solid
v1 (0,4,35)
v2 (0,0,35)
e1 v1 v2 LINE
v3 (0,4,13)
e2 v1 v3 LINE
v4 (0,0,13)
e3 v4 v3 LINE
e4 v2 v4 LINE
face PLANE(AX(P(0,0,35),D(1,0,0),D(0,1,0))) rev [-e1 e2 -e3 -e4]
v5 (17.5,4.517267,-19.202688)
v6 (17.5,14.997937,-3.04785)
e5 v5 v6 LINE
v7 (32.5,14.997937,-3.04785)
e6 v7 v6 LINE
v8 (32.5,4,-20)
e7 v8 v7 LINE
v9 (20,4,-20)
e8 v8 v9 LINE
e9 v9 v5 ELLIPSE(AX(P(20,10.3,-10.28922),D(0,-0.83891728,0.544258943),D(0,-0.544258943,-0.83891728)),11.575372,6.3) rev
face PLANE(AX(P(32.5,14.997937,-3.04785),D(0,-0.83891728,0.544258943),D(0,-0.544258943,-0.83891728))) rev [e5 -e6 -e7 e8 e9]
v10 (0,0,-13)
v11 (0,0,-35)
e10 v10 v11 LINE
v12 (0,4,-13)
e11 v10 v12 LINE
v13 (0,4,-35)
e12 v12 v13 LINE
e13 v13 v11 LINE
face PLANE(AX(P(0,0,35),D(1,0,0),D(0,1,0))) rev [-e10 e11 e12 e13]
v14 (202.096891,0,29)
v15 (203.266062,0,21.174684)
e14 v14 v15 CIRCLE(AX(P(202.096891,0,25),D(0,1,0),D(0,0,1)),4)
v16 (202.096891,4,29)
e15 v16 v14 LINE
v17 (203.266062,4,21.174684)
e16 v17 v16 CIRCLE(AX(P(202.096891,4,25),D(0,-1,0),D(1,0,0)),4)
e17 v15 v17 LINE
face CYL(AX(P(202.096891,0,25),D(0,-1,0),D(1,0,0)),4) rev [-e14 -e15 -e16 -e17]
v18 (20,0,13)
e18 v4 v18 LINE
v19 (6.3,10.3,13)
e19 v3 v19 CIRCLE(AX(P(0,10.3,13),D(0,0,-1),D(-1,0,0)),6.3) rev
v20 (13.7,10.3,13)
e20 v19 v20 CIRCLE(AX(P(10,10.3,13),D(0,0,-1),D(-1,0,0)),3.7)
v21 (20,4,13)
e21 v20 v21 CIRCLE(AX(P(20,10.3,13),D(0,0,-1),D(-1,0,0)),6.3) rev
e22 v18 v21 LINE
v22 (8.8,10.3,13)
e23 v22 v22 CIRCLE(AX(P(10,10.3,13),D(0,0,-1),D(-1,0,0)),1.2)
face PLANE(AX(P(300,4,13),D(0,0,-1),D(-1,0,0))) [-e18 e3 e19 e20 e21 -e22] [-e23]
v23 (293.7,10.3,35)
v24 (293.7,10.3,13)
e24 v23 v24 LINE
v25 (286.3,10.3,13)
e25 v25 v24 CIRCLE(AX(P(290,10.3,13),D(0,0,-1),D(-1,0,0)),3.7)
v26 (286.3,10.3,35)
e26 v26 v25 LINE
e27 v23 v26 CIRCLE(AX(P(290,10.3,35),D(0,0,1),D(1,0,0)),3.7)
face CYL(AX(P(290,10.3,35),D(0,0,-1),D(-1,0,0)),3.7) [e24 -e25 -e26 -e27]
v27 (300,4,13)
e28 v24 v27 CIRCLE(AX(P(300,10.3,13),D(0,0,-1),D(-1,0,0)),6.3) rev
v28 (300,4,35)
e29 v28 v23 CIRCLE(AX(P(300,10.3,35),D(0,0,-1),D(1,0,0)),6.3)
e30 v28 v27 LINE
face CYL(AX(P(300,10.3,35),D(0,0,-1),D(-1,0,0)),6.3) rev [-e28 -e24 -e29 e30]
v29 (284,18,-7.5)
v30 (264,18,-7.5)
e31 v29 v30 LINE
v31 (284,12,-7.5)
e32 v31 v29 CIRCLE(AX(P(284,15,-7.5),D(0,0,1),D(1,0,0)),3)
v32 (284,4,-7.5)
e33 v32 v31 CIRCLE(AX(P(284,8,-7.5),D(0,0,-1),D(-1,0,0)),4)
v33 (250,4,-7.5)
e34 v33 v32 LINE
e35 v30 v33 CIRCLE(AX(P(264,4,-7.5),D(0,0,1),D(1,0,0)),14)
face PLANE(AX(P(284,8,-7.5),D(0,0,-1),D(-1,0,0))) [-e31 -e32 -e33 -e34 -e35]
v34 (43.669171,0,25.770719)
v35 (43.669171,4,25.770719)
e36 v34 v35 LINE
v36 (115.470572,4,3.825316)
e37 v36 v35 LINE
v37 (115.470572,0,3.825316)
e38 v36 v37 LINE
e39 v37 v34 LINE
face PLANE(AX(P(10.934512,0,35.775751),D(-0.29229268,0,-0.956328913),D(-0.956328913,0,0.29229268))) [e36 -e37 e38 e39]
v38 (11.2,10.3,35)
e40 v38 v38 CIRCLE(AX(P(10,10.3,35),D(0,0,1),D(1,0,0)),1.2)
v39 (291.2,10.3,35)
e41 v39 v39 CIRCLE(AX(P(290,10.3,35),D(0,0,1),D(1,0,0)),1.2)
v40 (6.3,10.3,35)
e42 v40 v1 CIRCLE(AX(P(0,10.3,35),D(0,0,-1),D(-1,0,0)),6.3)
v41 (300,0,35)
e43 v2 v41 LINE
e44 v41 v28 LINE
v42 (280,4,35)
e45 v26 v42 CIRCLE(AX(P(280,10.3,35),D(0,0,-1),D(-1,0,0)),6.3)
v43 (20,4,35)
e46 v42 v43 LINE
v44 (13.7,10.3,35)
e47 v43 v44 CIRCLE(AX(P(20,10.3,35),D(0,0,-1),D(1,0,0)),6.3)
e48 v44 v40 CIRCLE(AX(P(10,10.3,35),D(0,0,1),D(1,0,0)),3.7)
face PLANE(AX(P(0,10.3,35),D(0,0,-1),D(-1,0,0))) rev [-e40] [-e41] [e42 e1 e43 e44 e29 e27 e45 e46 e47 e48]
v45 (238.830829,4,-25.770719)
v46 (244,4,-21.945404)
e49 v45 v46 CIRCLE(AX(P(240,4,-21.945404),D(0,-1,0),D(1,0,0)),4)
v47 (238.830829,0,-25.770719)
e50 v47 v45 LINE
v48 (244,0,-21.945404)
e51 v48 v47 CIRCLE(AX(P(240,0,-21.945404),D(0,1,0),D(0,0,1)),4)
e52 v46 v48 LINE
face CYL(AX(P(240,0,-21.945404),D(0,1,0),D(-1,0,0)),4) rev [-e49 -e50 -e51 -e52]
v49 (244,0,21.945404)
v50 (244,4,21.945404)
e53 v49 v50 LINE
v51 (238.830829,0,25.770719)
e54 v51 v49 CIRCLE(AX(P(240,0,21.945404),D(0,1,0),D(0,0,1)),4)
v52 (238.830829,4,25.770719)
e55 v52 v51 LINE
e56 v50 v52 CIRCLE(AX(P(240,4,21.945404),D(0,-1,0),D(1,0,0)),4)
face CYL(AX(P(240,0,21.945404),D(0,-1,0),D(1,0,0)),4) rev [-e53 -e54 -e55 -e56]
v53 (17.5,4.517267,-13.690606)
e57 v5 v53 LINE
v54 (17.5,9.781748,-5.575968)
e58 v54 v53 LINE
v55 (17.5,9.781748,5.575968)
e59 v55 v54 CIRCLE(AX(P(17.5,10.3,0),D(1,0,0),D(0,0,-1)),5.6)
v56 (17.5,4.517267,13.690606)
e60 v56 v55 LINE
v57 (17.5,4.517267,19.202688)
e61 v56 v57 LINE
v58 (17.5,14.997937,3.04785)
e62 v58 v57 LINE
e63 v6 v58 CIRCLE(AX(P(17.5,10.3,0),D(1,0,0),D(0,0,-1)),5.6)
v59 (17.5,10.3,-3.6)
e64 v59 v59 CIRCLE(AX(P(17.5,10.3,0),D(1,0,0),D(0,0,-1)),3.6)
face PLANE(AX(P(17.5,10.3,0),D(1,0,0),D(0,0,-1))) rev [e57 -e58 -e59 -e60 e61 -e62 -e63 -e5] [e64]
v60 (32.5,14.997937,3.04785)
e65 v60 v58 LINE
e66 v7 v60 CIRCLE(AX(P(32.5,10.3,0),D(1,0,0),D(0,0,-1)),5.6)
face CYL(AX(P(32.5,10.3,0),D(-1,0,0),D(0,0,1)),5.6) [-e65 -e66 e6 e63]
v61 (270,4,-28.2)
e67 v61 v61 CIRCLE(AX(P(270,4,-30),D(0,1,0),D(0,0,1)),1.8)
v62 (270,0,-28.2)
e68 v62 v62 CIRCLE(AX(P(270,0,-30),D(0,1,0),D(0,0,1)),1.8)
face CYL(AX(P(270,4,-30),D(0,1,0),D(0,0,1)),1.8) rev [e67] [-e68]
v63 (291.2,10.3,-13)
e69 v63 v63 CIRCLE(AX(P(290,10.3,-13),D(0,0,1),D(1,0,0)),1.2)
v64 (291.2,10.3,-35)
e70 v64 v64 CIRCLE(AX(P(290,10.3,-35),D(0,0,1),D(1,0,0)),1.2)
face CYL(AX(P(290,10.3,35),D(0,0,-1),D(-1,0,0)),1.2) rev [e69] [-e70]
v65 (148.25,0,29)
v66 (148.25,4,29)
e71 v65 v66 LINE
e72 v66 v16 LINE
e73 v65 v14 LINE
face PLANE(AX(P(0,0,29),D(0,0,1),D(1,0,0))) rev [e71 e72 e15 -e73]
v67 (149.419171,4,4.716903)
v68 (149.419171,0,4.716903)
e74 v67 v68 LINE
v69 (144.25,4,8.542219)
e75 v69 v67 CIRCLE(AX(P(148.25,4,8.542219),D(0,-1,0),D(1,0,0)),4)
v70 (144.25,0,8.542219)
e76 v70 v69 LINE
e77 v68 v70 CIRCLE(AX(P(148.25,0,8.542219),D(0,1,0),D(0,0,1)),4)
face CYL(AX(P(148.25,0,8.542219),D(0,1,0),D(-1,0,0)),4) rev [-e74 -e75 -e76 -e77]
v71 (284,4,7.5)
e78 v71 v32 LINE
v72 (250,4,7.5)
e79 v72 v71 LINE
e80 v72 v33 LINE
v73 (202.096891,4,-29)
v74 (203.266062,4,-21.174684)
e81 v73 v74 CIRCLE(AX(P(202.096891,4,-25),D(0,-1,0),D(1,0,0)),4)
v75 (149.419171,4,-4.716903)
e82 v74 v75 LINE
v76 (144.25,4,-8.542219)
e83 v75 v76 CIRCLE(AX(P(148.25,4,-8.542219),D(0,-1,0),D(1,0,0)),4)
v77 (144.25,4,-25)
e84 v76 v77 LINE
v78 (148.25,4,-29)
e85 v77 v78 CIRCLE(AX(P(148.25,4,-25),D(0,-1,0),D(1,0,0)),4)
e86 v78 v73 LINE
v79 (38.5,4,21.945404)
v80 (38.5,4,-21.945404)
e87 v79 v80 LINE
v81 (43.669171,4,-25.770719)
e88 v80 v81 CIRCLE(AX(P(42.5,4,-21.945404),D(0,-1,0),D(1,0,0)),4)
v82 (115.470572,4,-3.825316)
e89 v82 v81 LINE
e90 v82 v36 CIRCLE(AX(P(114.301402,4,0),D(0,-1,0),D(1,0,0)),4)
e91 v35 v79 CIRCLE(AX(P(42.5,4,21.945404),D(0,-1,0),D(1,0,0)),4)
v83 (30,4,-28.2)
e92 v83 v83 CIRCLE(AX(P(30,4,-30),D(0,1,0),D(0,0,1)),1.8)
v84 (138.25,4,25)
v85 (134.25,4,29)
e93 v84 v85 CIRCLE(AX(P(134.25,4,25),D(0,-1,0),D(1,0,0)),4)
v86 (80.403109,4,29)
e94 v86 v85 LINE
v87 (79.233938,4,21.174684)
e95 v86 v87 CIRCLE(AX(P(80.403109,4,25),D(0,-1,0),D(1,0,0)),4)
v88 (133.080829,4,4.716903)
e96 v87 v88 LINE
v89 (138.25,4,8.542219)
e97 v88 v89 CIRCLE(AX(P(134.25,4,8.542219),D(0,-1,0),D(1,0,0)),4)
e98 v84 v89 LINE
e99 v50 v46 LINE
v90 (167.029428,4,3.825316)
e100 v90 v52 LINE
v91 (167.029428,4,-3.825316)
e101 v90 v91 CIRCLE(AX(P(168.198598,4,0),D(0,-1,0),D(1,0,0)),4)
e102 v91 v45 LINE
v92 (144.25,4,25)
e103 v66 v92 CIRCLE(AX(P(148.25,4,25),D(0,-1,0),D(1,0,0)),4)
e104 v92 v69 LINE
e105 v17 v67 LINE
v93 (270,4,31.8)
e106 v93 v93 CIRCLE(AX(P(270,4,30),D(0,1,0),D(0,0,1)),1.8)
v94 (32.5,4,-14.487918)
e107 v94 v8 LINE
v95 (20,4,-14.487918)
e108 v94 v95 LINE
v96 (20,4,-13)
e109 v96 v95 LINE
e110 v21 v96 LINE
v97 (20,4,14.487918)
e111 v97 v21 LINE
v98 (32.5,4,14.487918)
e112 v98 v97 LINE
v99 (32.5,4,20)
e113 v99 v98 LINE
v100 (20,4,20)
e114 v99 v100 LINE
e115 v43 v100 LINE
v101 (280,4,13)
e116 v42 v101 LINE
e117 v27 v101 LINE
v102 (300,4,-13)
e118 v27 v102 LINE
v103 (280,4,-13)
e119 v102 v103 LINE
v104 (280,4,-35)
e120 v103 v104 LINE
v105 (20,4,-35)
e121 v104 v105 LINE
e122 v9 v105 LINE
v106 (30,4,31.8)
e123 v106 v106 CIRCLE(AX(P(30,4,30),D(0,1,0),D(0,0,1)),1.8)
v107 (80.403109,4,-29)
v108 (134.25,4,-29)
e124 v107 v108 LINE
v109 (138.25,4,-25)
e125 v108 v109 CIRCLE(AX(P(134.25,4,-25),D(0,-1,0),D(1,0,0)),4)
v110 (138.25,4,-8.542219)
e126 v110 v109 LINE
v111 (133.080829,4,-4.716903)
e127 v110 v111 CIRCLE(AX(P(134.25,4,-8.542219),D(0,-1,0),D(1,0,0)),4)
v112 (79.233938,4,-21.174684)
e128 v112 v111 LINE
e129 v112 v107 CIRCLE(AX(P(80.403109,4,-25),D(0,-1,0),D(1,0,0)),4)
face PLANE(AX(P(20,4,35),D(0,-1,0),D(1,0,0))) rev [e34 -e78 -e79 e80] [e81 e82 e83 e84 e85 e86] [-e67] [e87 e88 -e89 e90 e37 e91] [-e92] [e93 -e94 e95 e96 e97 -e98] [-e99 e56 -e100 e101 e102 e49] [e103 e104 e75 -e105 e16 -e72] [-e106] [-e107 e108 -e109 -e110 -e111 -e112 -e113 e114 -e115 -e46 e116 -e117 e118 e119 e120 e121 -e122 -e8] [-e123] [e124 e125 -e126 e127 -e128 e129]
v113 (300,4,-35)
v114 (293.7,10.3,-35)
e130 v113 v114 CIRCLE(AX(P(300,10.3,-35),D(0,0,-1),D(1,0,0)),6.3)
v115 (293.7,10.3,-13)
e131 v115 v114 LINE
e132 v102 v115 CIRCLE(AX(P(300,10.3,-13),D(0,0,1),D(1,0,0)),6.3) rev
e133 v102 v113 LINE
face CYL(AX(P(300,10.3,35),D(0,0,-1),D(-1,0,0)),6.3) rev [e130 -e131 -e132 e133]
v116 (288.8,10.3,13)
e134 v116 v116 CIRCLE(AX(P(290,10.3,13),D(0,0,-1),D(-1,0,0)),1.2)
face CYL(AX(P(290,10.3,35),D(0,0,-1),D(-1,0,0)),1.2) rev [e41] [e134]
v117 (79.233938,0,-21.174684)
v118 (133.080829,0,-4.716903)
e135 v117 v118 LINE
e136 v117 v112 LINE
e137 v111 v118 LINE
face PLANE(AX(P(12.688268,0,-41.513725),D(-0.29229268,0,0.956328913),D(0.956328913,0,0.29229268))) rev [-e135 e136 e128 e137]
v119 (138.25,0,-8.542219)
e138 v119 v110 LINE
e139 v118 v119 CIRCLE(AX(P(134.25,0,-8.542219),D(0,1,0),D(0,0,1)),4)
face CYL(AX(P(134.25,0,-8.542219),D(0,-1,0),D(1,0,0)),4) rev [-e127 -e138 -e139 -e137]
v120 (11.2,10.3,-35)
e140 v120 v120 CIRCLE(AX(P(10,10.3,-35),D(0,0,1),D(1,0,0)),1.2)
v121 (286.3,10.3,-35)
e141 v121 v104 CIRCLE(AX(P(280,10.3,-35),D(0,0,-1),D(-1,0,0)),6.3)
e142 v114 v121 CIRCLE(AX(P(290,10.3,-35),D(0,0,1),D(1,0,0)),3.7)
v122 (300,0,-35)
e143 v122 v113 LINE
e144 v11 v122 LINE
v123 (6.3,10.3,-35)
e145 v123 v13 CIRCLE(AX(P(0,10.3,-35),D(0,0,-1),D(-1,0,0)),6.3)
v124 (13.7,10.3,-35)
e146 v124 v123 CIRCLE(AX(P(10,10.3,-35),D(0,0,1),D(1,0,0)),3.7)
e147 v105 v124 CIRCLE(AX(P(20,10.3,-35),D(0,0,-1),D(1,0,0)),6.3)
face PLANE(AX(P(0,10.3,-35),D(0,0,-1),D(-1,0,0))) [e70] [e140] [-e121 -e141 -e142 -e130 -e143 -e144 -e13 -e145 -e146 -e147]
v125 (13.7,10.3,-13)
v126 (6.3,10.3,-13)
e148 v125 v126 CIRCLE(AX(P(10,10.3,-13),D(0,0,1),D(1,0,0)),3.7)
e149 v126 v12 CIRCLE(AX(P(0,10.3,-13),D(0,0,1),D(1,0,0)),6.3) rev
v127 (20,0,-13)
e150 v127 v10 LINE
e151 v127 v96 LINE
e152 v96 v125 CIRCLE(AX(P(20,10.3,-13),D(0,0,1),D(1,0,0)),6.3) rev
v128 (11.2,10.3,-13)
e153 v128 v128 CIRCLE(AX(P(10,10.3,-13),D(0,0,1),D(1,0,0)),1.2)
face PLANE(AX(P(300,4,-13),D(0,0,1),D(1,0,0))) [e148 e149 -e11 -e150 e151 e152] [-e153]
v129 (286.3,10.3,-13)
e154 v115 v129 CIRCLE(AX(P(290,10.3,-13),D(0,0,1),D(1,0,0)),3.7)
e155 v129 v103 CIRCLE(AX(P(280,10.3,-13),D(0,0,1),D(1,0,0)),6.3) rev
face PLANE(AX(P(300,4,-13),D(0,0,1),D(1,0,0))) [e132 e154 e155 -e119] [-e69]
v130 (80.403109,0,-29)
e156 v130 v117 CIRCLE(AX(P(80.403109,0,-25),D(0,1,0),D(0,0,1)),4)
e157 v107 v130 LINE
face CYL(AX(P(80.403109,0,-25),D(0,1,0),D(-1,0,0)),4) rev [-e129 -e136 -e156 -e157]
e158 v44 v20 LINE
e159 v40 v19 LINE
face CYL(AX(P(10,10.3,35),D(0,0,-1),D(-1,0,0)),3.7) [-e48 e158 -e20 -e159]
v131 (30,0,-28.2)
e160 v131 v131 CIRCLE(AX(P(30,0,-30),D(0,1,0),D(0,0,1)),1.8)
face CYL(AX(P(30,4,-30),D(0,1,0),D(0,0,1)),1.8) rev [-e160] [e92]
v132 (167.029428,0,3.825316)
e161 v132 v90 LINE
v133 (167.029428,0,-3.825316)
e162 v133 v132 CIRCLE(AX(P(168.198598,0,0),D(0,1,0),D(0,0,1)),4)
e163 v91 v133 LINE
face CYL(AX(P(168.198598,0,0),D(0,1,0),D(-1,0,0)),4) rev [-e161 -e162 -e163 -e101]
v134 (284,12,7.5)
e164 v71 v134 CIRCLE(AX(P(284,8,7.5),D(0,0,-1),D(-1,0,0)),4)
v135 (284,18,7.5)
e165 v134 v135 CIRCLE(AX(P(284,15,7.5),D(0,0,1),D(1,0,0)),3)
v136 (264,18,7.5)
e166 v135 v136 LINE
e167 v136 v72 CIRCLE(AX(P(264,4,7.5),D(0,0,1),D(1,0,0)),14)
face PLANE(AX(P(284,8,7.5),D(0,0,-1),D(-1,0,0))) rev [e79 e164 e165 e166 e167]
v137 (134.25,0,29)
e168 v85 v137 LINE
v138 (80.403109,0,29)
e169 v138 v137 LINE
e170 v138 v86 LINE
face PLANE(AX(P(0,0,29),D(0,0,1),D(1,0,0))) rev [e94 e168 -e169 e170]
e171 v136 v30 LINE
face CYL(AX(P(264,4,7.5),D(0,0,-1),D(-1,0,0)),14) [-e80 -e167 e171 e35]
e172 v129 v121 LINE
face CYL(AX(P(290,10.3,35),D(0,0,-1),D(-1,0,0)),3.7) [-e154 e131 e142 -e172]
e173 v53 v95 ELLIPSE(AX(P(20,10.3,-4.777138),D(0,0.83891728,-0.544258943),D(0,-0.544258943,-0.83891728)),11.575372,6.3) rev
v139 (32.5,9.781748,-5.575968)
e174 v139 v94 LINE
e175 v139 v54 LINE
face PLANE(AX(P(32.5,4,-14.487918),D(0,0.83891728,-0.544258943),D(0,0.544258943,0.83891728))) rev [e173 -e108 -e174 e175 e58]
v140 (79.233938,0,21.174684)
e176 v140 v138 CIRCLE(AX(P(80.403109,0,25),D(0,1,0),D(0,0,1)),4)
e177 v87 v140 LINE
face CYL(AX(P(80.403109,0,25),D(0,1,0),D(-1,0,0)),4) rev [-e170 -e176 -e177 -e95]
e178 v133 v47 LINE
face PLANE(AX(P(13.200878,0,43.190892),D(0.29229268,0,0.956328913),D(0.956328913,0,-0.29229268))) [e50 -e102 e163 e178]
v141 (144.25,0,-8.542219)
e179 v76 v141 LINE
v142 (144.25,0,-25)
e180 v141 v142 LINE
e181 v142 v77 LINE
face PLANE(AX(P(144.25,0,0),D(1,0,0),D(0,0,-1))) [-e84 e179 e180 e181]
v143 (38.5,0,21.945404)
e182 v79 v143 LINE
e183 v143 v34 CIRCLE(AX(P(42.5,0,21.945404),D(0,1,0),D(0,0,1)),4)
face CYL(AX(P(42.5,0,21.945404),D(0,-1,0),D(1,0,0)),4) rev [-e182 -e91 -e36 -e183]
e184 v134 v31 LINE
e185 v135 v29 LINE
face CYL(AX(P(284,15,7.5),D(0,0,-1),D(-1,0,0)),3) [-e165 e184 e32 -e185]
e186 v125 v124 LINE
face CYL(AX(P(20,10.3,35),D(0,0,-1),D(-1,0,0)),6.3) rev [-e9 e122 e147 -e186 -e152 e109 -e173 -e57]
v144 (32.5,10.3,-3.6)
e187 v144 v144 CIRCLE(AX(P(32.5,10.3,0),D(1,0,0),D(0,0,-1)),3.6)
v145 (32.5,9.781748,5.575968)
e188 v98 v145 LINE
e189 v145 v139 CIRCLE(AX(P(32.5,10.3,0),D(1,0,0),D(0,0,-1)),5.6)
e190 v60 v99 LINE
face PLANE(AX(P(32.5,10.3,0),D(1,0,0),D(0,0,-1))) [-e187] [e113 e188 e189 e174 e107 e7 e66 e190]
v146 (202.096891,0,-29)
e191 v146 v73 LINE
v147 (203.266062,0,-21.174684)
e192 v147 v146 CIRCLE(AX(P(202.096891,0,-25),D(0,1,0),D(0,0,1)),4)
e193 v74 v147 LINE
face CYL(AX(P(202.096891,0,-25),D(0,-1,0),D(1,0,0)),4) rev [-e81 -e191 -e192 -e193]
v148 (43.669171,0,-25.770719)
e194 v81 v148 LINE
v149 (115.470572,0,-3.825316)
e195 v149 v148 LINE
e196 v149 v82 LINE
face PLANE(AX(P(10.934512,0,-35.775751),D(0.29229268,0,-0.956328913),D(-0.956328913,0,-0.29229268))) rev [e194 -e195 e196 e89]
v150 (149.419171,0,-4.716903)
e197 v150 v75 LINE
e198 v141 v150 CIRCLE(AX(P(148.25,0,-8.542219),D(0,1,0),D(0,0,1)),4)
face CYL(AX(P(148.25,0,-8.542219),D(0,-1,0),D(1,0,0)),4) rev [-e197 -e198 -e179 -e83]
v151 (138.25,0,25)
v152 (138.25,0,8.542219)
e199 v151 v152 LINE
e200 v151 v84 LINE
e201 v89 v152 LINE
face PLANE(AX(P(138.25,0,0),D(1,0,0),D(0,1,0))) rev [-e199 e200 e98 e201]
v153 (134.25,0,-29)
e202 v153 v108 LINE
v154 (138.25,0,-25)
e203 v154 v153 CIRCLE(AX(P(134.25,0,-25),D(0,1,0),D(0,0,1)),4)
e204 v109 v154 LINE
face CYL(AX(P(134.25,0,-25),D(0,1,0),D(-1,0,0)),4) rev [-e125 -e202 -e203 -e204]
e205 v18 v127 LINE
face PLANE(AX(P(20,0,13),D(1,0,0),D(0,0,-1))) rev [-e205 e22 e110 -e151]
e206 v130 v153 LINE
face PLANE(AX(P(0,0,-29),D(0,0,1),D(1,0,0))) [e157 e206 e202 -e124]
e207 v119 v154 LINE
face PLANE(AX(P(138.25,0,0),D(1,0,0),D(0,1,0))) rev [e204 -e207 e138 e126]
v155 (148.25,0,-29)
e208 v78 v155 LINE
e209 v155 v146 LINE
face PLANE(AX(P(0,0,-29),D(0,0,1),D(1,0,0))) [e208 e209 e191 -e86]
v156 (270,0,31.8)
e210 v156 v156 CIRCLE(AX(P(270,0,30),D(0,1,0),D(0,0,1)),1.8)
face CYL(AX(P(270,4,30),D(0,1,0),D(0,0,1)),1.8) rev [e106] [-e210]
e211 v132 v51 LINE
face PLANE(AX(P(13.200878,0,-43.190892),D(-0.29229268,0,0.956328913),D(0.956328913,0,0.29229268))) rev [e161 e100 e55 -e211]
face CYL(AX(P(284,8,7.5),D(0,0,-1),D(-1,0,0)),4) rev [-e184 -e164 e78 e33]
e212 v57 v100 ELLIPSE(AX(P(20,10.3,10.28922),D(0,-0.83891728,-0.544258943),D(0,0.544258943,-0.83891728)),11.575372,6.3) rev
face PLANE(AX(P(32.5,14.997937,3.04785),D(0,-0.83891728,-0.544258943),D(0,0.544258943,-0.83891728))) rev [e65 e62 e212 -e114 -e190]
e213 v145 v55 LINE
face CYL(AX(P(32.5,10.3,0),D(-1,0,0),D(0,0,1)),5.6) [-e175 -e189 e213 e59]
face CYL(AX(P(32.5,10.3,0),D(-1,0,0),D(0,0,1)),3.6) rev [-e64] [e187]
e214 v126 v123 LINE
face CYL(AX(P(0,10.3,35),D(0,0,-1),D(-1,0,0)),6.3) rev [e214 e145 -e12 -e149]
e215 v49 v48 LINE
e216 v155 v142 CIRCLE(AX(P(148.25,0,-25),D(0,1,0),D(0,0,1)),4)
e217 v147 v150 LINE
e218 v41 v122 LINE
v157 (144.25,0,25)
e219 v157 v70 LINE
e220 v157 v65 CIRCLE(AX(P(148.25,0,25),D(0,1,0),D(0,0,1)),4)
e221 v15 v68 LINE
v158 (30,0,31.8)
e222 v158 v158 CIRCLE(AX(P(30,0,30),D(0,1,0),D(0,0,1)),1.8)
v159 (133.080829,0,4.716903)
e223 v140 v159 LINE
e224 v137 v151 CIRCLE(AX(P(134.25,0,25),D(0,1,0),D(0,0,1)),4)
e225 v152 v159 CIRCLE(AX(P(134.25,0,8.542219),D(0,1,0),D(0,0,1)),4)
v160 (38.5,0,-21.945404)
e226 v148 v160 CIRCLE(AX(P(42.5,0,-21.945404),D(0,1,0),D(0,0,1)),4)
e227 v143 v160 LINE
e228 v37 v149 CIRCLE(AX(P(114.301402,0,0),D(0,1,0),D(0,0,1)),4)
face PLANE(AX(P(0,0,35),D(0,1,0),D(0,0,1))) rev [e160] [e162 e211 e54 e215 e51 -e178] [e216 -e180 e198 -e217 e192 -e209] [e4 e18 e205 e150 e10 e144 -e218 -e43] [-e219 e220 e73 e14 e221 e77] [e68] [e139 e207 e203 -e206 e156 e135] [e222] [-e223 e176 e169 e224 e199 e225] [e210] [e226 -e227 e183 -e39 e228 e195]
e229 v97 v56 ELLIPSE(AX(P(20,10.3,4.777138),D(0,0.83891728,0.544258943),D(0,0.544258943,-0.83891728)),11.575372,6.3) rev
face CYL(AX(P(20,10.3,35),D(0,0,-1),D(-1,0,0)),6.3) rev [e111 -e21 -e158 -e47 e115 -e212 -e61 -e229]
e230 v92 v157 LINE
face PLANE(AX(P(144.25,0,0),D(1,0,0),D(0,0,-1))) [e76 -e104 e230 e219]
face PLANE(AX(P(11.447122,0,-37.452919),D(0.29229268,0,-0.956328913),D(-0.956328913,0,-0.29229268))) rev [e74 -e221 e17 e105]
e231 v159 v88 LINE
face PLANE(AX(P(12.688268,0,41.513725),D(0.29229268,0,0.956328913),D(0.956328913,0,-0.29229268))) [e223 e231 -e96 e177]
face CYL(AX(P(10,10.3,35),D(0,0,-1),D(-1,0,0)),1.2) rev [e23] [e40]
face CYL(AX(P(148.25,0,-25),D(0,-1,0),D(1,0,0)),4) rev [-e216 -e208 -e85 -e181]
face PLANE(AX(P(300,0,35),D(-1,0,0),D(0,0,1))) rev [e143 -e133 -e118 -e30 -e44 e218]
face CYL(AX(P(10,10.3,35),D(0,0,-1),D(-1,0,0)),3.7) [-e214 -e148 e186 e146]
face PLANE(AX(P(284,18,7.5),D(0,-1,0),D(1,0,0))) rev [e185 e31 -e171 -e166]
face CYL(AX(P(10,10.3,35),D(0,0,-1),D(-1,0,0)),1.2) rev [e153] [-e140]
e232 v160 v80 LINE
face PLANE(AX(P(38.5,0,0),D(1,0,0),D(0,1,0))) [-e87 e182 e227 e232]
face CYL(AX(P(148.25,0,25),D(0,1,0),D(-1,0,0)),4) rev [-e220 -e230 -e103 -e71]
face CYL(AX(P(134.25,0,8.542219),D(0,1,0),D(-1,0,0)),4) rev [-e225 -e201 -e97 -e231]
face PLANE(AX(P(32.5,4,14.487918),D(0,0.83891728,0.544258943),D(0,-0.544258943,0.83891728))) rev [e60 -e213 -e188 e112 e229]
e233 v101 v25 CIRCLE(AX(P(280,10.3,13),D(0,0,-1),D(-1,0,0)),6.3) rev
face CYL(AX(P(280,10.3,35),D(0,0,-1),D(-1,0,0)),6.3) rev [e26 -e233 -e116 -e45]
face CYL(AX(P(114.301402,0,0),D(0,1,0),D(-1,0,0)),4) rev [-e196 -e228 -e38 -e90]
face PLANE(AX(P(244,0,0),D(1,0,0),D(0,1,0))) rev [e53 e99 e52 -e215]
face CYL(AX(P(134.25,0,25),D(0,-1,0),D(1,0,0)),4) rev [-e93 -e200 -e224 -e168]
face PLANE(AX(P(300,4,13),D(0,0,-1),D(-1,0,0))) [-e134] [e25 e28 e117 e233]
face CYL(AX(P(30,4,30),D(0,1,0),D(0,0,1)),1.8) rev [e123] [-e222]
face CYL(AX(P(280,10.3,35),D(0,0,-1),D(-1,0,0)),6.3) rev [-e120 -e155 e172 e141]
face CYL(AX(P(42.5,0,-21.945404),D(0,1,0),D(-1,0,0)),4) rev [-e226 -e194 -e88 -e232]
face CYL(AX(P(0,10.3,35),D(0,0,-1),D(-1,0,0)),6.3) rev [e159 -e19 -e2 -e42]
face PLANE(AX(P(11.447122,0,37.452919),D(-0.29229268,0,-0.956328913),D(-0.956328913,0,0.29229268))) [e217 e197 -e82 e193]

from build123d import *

# Parameters (mm, degrees)
SKETCH1_R                    = 1.2
BOSS_EXTRUDE1_DEPTH          = 35
SKETCH2_W                    = 26
SKETCH2_H                    = 10
CUT_EXTRUDE1_DEPTH           = 303.359058075
BOSS_EXTRUDE2_DEPTH          = 7.5
SKETCH4_W                    = 20
SKETCH4_H                    = 26
CUT_EXTRUDE2_DEPTH           = 303.359058075
BOSS_EXTRUDE3_START          = 17.5
SKETCH6_R                    = 3.6
BOSS_EXTRUDE3_DEPTH          = 15
M3_CLEARANCE_HOLE1_OUTLINE_R = 1.8
M3_CLEARANCE_HOLE1_DEPTH     = 4
CUT_EXTRUDE7_DEPTH           = 303.359058075
FILLET8_R                    = 4


# Read off the part's stored shape, not the designer's step: M3 Clearance Hole1
with BuildPart() as part:
    # Sketch1 → Boss-Extrude1 (new, symmetric)
    with BuildSketch(Plane.XY):
        with BuildLine():
            Line((0, 0), (300, 0))
            Line((300, 0), (300, 4))
            ThreePointArc((300, 4), (295.545227279, 5.845227279), (293.7, 10.3))
            ThreePointArc((293.7, 10.3), (290, 14), (286.3, 10.3))
            ThreePointArc((286.3, 10.3), (284.454772721, 5.845227279), (280, 4))
            Line((280, 4), (20, 4))
            ThreePointArc((20, 4), (15.545227279, 5.845227279), (13.7, 10.3))
            ThreePointArc((13.7, 10.3), (10, 14), (6.3, 10.3))
            ThreePointArc((6.3, 10.3), (4.454772721, 5.845227279), (0, 4))
            Line((0, 4), (0, 0))
        make_face()
        with Locations((10, 10.3)):
            Circle(SKETCH1_R, mode=Mode.SUBTRACT)
        with Locations((290, 10.3)):
            Circle(SKETCH1_R, mode=Mode.SUBTRACT)
    extrude(amount=BOSS_EXTRUDE1_DEPTH, both=True)

    # Sketch2 → Cut-Extrude1 (cut, through all)
    with BuildSketch(Plane(origin=(0, 0, 0), x_dir=(0, 0, -1), z_dir=(1, 0, 0))):
        with Locations((0, 9)):
            Rectangle(SKETCH2_W, SKETCH2_H)
    extrude(amount=CUT_EXTRUDE1_DEPTH, mode=Mode.SUBTRACT)

    # Sketch3 → Boss-Extrude2 (add, symmetric)
    with BuildSketch(Plane.XY):
        with BuildLine():
            Line((284, 18), (264, 18))
            ThreePointArc((264, 18), (254.100505063, 13.899494937), (250, 4))
            Line((250, 4), (284, 4))
            ThreePointArc((284, 4), (280, 8), (284, 12))
            ThreePointArc((284, 12), (287, 15), (284, 18))
        make_face()
    extrude(amount=BOSS_EXTRUDE2_DEPTH, both=True)

    # Sketch4 → Cut-Extrude2 (cut, through all)
    with BuildSketch(Plane(origin=(0, 4, 0), x_dir=(1, 0, 0), z_dir=(0, 1, 0))):
        with Locations((10, 0)):
            Rectangle(SKETCH4_W, SKETCH4_H)
    extrude(amount=-CUT_EXTRUDE2_DEPTH, mode=Mode.SUBTRACT)

    # Sketch6 → Boss-Extrude3 (add)
    with BuildSketch(Plane(origin=(0, 0, 0), x_dir=(0, 0, -1), z_dir=(1, 0, 0)).offset(BOSS_EXTRUDE3_START)):
        with BuildLine():
            Line((-14.487917861, 4), (-5.57596765, 9.781748355))
            ThreePointArc((-5.57596765, 9.781748355), (0, 4.7), (5.57596765, 9.781748355))
            Line((5.57596765, 9.781748355), (14.487917861, 4))
            Line((14.487917861, 4), (20, 4))
            Line((20, 4), (3.047850082, 14.997936768))
            ThreePointArc((3.047850082, 14.997936768), (0, 15.9), (-3.047850082, 14.997936768))
            Line((-3.047850082, 14.997936768), (-20, 4))
            Line((-20, 4), (-14.487917861, 4))
        make_face()
        with Locations((0, 10.3)):
            Circle(SKETCH6_R, mode=Mode.SUBTRACT)
    extrude(amount=BOSS_EXTRUDE3_DEPTH)

    # M3 Clearance Hole1 outline → M3 Clearance Hole1 (cut)
    with BuildSketch(Plane(origin=(0, 0, 0), x_dir=(1, 0, 0), z_dir=(0, 1, 0))):
        with Locations((30, -30)):
            Circle(M3_CLEARANCE_HOLE1_OUTLINE_R)
        with Locations((270, 30)):
            Circle(M3_CLEARANCE_HOLE1_OUTLINE_R)
        with Locations((270, -30)):
            Circle(M3_CLEARANCE_HOLE1_OUTLINE_R)
        with Locations((30, 30)):
            Circle(M3_CLEARANCE_HOLE1_OUTLINE_R)
    extrude(amount=M3_CLEARANCE_HOLE1_DEPTH, mode=Mode.SUBTRACT)

    # Sketch12 → Cut-Extrude7 (cut, through all)
    with BuildSketch(Plane(origin=(0, 4, 0), x_dir=(1, 0, 0), z_dir=(0, 1, 0))):
        Polygon((53.630917429, -29), (138.25, -29), (138.25, -3.136996028), align=None)
        Polygon((38.5, -27.350626478), (127.986315, 0), (38.5, 27.350626478), align=None)
        Polygon((138.25, 3.136996028), (138.25, 29), (53.630917429, 29), align=None)
        Polygon((144.25, 29), (144.25, 3.136996028), (228.869082571, 29), align=None)
        Polygon((154.513685, 0), (244, -27.350626478), (244, 27.350626478), align=None)
        Polygon((144.25, -29), (228.869082571, -29), (144.25, -3.136996028), align=None)
    extrude(amount=-CUT_EXTRUDE7_DEPTH, mode=Mode.SUBTRACT)

    # Fillet8
    fillet8_edges = [part.edges().sort_by_distance(p)[0] for p in [
        (53.630917429, 2, -29),
        (138.25, 2, -29),
        (138.25, 2, -3.136996028),
        (38.5, 2, 27.350626478),
        (38.5, 2, -27.350626478),
        (127.986315, 2, 0),
        (244, 2, 27.350626478),
        (154.513685, 2, 0),
        (244, 2, -27.350626478),
        (144.25, 2, -29),
        (228.869082571, 2, -29),
        (144.25, 2, -3.136996028),
        (144.25, 2, 29),
        (144.25, 2, 3.136996028),
        (228.869082571, 2, 29),
        (53.630917429, 2, 29),
        (138.25, 2, 3.136996028),
        (138.25, 2, 29),
    ]]
    fillet(fillet8_edges, radius=FILLET8_R)


solid = part.part
